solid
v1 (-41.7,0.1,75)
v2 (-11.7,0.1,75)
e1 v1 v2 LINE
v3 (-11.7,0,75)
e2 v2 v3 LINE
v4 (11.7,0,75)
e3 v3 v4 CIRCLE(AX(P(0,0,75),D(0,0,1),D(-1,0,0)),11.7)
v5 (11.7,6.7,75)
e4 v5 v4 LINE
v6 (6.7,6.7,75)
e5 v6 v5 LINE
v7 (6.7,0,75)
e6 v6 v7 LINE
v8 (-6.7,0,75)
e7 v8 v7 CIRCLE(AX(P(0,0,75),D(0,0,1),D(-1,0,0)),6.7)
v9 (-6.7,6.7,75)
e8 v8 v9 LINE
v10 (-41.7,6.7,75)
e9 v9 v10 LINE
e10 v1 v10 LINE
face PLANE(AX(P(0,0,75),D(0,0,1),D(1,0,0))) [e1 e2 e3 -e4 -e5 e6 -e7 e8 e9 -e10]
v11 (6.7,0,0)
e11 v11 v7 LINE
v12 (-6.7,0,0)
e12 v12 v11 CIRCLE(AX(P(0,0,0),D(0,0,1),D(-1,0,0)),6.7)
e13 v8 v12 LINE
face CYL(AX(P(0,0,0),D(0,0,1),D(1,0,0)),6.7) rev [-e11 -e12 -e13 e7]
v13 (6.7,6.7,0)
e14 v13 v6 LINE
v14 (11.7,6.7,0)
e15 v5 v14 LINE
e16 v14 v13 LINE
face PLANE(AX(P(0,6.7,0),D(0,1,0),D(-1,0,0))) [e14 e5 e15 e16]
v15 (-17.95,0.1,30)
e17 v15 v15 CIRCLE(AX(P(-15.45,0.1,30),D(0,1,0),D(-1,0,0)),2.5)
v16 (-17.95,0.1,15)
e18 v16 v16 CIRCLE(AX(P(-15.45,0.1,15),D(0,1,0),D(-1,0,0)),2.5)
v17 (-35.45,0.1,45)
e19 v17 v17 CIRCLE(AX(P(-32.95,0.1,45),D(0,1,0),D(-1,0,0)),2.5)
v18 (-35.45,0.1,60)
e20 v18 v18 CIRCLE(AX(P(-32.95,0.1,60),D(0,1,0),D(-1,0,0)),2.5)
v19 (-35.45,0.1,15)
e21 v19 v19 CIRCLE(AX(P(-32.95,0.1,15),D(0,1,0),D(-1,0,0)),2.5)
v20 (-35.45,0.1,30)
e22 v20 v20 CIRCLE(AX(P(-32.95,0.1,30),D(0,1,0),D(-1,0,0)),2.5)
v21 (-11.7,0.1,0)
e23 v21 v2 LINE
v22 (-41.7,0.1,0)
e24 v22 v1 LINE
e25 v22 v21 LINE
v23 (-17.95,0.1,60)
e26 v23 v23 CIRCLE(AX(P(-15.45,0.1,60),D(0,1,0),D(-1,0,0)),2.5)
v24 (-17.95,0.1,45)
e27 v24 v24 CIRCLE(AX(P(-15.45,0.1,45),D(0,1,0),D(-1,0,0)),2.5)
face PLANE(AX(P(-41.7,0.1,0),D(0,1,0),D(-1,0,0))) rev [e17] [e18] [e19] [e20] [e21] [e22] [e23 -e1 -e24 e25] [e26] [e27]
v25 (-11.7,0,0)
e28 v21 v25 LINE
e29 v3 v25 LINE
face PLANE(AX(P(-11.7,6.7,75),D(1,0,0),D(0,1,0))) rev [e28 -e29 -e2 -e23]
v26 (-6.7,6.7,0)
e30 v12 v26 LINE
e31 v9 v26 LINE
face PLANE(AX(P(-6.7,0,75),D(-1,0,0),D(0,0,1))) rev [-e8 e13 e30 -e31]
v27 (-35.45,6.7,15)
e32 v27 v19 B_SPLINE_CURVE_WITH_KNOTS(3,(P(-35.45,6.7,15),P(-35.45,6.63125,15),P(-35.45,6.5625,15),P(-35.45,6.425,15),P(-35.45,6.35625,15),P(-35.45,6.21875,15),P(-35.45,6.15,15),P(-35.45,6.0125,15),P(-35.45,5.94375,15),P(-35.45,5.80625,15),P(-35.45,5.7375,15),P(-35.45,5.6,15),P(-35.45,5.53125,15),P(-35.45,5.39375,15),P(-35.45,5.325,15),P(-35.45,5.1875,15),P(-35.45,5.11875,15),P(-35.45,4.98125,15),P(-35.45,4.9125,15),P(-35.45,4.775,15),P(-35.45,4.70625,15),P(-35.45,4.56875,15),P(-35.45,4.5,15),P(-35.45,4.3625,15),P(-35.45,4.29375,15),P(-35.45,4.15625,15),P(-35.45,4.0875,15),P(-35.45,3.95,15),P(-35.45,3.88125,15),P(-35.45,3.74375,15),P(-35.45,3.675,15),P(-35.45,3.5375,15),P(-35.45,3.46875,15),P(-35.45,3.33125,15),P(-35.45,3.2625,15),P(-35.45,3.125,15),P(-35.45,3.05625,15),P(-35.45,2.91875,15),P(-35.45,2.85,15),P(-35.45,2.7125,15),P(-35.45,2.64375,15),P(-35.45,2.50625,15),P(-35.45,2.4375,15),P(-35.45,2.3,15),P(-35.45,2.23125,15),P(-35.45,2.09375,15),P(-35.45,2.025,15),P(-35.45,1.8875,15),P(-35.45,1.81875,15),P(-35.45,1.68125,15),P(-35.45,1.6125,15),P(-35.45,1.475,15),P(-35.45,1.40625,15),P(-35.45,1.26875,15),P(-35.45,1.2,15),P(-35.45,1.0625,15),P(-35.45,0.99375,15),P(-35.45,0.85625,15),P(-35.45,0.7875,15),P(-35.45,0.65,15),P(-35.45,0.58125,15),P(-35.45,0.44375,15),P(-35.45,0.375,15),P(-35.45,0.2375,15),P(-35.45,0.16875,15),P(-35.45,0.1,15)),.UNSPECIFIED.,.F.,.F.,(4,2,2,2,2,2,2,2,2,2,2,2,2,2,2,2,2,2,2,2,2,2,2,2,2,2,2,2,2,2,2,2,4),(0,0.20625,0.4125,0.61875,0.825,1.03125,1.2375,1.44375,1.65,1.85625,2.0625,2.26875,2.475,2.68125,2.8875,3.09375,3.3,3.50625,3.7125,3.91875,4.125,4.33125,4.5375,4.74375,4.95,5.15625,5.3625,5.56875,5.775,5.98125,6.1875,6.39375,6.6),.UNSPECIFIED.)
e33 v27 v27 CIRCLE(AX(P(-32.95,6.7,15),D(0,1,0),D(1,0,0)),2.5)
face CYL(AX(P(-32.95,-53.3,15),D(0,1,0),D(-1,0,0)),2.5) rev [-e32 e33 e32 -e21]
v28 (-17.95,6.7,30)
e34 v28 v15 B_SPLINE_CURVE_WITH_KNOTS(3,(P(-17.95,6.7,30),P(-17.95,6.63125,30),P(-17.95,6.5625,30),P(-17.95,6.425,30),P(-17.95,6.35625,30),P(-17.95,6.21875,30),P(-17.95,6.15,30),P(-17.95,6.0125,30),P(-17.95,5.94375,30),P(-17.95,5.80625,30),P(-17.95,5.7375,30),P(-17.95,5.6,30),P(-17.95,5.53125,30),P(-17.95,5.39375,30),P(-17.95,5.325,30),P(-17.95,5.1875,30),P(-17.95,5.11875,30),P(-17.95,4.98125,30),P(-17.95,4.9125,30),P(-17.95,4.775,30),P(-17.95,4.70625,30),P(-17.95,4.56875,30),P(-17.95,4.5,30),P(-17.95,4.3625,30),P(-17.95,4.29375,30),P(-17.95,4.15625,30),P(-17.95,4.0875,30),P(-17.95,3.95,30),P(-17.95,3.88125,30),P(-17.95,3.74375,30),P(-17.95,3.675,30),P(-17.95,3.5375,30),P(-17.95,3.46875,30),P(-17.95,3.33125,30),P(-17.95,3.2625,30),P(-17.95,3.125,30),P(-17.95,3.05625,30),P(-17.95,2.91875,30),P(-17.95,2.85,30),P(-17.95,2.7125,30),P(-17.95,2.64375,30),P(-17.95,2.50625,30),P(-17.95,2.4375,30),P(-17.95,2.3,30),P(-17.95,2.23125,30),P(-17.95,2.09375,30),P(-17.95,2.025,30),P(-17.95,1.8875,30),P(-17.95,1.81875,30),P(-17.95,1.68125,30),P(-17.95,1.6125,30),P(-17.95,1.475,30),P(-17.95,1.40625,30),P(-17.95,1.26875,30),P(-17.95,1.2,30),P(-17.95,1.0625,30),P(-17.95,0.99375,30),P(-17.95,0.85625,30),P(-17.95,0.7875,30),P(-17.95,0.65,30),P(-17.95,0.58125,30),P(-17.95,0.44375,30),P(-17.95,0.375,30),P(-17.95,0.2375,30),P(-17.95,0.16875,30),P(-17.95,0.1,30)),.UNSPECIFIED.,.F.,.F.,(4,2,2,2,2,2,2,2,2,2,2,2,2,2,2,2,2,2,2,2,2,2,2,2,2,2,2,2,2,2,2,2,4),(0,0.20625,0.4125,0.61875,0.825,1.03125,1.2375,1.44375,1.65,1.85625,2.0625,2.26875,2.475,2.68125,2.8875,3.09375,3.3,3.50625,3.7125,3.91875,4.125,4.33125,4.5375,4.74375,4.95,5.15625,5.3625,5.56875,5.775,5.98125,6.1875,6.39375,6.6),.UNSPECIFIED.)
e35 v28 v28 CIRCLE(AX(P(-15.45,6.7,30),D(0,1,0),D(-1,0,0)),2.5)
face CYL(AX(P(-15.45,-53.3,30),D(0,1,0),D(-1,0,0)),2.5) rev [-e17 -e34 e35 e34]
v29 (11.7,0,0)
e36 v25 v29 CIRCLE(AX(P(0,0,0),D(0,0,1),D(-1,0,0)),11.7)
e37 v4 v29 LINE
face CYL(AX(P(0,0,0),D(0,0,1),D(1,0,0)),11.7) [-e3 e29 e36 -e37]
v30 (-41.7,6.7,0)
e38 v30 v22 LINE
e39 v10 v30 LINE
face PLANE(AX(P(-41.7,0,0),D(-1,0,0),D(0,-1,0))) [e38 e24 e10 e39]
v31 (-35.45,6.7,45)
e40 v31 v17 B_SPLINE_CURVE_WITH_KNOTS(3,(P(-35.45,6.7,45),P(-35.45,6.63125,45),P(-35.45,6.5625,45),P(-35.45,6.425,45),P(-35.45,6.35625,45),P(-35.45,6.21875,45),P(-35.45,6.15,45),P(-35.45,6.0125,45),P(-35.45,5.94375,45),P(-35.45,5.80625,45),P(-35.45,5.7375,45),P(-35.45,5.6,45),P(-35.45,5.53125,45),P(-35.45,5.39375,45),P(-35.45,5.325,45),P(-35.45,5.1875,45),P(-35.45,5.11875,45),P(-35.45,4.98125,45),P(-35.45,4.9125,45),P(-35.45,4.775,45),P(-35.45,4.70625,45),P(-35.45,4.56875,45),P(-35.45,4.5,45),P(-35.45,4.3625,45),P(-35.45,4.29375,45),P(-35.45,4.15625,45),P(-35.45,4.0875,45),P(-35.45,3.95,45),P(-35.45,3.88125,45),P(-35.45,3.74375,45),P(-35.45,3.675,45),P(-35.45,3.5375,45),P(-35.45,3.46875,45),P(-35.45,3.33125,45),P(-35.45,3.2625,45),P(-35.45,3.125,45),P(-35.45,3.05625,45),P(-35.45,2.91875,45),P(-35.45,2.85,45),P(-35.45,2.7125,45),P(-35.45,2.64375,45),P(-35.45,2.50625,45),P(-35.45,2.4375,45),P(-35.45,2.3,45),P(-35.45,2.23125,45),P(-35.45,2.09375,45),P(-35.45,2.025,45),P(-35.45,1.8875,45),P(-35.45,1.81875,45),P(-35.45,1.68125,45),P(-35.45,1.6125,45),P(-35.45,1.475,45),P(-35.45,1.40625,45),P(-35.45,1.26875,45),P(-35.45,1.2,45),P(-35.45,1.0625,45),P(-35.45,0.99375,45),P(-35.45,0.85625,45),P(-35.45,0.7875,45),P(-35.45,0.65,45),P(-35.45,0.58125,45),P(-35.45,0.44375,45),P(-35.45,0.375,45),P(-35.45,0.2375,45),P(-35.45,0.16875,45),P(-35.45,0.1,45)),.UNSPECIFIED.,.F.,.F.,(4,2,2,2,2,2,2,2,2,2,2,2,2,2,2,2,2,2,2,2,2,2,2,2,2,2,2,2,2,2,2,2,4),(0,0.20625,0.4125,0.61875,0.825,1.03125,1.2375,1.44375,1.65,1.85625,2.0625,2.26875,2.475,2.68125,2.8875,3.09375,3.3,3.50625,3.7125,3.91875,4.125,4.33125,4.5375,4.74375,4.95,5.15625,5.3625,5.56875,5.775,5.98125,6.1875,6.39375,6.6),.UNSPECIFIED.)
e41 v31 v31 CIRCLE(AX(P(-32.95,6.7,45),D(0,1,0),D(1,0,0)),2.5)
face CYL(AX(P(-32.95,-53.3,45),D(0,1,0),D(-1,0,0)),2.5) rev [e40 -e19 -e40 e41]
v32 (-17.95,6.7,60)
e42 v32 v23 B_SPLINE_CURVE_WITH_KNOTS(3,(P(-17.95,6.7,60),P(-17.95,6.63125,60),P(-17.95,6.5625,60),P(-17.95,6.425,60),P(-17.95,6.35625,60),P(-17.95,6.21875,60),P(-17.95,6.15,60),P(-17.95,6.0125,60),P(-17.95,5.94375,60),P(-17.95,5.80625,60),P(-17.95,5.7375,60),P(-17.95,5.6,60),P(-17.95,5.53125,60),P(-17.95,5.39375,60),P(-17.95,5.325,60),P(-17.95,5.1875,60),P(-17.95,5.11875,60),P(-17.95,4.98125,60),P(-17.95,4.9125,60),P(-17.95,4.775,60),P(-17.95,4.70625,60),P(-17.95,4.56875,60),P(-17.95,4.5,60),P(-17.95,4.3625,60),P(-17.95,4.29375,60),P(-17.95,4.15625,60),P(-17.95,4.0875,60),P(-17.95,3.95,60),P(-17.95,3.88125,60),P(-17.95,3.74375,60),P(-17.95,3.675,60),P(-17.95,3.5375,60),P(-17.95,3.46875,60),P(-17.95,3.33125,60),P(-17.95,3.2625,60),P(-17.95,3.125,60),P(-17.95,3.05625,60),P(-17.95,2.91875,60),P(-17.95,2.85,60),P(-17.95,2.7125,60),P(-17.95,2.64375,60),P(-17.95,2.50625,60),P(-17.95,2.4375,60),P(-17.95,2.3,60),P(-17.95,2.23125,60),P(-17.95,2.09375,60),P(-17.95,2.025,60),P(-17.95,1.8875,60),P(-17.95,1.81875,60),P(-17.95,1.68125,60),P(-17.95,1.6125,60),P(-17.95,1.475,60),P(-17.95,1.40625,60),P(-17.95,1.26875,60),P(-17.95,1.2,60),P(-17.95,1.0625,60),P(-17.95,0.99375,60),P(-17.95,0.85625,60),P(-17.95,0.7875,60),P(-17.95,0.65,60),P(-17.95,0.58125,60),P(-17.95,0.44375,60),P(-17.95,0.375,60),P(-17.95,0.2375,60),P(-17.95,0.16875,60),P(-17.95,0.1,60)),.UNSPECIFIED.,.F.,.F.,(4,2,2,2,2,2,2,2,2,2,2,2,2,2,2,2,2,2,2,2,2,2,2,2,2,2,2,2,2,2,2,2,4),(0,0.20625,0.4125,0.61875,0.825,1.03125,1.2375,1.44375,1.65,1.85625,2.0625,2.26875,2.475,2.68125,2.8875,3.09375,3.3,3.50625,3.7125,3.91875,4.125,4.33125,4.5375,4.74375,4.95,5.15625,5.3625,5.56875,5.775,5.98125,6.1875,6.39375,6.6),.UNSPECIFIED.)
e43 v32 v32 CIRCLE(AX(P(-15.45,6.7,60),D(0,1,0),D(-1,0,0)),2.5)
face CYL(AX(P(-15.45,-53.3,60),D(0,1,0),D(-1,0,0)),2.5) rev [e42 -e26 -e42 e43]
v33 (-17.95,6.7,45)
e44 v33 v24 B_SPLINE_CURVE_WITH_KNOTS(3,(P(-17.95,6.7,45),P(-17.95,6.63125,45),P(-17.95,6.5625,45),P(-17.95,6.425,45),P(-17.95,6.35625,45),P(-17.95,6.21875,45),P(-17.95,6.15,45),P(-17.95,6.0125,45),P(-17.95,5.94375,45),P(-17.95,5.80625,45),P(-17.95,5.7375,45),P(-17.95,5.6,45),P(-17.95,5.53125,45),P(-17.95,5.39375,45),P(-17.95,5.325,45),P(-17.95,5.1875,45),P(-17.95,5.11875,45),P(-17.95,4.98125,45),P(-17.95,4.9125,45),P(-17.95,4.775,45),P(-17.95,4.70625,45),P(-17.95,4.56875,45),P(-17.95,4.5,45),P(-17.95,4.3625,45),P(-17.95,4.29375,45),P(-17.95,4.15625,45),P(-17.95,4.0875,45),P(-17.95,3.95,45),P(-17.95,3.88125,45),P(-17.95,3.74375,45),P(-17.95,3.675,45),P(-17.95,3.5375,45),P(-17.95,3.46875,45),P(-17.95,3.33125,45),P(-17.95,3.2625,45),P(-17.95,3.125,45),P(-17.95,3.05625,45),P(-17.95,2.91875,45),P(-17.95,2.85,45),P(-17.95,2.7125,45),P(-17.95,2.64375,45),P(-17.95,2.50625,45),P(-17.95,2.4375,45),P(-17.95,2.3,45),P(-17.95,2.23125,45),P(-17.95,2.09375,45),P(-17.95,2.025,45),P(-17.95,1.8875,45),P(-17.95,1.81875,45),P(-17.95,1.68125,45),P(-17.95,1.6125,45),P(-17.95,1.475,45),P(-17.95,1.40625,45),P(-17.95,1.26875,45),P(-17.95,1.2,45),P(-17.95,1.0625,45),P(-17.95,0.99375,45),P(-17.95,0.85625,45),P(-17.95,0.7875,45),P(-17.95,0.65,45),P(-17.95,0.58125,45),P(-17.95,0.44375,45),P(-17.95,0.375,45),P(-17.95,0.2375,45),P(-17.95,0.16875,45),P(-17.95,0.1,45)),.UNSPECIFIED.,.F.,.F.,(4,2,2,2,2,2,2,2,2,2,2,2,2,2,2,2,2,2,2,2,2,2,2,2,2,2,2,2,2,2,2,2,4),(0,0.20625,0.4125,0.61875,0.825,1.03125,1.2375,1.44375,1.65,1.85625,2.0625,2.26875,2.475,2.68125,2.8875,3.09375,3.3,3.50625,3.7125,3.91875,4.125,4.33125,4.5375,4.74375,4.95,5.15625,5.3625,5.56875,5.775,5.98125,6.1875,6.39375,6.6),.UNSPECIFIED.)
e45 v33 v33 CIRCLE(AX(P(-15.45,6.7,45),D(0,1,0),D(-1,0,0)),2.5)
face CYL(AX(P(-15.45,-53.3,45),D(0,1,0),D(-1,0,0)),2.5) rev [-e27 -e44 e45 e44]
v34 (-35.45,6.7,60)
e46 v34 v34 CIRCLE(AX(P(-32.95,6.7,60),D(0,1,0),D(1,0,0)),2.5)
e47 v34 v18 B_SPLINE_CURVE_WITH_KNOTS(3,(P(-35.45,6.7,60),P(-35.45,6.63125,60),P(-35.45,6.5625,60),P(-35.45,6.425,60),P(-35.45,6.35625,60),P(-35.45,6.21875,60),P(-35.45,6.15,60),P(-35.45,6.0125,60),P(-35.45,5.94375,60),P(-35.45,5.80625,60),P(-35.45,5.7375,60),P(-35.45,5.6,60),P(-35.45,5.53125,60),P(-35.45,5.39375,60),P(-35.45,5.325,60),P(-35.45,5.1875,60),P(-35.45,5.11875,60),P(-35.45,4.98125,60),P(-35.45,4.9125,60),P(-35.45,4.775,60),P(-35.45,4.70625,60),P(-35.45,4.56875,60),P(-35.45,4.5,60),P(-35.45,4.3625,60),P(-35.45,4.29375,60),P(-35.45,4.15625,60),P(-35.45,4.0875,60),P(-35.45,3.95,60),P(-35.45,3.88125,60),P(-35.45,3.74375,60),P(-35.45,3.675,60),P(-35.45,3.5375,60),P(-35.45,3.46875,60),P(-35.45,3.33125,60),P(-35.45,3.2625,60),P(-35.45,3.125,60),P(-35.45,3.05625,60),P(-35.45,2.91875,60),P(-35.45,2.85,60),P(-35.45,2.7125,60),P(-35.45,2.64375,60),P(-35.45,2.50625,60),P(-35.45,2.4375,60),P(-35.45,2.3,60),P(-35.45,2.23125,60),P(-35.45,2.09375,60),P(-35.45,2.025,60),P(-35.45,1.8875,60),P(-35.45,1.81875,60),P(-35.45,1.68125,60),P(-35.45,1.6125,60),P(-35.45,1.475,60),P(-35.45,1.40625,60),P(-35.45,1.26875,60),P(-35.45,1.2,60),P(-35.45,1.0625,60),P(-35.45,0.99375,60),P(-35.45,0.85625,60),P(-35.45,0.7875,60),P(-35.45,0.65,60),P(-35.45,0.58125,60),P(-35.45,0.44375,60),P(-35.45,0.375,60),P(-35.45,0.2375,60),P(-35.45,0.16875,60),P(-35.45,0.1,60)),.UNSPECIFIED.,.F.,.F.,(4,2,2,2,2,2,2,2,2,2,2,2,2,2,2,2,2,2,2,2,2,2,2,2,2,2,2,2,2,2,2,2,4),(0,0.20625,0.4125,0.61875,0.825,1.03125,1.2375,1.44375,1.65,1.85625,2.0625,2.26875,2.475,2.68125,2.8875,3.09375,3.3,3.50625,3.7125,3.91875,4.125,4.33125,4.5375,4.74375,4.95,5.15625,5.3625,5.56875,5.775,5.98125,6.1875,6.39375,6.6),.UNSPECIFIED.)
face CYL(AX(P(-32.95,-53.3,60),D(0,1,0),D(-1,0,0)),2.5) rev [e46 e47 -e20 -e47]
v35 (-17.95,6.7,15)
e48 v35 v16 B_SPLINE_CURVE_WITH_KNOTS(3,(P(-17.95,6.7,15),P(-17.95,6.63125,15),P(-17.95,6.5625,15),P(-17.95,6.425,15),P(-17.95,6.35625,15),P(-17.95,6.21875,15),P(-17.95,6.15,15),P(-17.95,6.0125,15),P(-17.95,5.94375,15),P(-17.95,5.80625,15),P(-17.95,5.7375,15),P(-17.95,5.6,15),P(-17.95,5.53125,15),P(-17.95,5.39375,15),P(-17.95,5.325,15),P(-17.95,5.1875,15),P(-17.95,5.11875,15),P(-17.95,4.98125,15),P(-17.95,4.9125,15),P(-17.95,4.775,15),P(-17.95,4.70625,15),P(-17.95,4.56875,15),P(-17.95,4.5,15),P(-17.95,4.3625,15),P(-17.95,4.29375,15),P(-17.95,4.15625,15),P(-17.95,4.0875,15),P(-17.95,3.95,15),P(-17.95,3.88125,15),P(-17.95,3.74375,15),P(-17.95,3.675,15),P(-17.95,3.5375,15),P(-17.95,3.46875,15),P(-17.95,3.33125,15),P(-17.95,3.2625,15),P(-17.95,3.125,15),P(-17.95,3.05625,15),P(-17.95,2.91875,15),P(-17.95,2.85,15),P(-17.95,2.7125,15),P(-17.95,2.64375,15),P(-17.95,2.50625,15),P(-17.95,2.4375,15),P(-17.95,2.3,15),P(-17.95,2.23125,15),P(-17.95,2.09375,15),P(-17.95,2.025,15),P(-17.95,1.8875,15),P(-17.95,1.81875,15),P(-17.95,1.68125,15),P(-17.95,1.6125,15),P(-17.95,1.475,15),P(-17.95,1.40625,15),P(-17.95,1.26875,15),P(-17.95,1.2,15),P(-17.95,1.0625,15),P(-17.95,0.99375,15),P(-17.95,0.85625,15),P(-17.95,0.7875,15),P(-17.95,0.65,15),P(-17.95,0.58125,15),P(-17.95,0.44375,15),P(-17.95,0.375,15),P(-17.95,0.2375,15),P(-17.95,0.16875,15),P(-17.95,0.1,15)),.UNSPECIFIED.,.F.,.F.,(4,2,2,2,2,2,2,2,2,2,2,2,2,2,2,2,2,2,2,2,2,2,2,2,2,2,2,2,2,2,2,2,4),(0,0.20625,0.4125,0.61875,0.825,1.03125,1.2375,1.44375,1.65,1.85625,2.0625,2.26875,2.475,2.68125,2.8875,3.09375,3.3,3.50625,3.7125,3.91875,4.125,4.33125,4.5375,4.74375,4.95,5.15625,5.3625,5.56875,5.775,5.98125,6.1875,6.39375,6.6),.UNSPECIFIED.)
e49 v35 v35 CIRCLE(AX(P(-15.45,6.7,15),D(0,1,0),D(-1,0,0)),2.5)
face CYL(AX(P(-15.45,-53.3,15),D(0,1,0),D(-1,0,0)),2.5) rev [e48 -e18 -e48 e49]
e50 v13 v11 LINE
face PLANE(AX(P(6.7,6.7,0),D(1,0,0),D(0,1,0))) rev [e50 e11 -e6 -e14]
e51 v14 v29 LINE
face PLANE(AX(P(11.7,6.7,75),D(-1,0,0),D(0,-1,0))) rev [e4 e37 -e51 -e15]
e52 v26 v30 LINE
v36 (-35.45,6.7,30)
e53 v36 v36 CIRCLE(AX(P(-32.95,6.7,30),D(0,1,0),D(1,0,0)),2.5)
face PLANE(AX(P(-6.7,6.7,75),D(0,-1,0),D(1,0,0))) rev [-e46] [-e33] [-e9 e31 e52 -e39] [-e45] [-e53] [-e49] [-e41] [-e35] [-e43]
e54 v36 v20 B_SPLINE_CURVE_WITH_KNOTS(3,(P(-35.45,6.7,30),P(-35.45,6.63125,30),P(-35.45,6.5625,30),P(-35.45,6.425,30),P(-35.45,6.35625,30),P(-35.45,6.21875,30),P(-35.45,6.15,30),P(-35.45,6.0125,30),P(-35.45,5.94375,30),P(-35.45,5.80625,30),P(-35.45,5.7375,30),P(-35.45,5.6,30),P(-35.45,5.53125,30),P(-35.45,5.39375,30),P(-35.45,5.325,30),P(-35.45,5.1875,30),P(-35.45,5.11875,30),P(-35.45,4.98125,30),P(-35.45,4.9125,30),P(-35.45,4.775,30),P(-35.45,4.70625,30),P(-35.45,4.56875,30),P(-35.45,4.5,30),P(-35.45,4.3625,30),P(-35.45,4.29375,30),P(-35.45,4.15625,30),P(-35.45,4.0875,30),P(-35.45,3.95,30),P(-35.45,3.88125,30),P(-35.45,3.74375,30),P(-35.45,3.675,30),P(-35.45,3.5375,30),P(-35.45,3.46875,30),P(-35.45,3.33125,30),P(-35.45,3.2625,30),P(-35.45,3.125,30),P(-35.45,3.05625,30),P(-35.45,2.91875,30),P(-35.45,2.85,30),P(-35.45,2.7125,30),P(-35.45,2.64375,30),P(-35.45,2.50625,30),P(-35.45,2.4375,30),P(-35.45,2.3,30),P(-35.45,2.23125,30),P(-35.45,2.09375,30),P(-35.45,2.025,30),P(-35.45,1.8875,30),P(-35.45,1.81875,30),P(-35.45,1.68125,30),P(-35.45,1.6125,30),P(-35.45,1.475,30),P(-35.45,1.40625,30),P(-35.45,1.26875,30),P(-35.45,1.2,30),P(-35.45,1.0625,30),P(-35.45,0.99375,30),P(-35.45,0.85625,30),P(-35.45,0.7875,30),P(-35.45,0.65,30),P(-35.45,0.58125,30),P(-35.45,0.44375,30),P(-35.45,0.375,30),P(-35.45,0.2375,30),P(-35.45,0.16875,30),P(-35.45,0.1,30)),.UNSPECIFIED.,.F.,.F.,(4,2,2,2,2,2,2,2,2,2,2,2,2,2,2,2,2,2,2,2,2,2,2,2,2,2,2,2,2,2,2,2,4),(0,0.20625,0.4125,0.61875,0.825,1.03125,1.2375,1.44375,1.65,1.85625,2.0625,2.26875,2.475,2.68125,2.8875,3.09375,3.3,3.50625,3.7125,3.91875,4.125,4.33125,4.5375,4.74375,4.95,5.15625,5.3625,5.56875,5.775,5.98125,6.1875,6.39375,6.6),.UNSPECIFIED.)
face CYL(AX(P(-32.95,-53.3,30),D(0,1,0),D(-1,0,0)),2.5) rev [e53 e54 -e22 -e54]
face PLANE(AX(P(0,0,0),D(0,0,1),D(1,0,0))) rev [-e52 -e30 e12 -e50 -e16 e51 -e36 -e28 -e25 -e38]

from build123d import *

# Parameters (mm, degrees)
SKETCH3_W           = 5
SKETCH3_H           = 6.7
BOSS_EXTRUDE2_DEPTH = 75
SWEEP1_DEPTH        = 75
SKETCH8_W           = 5
SKETCH8_H           = 75
BOSS_EXTRUDE3_DEPTH = 6.7
SKETCH11_W          = 75
SKETCH11_H          = 6.6
BOSS_EXTRUDE4_DEPTH = 30
SKETCH12_R          = 2.5
CUT_EXTRUDE1_DEPTH  = 60


# Read off the part's stored shape, not the designer's step: Sweep1
with BuildPart() as part:
    # Sketch3 → Boss-Extrude2 (new body)
    with BuildSketch(Plane.XY):
        with Locations((-9.2, 3.35)):
            Rectangle(SKETCH3_W, SKETCH3_H)
    extrude(amount=BOSS_EXTRUDE2_DEPTH)

    # Sweep1 outline → Sweep1 (add)
    with BuildSketch(Plane.XY):
        with BuildLine():
            ThreePointArc((-11.7, 0), (0, -11.7), (11.7, 0))
            Line((11.7, 0), (6.7, 0))
            ThreePointArc((6.7, 0), (0, -6.7), (-6.7, 0))
            Line((-6.7, 0), (-11.7, 0))
        make_face()
    extrude(amount=SWEEP1_DEPTH)

    # Sketch8 → Boss-Extrude3 (add)
    with BuildSketch(Plane(origin=(0, 0, 0), x_dir=(1, 0, 0), z_dir=(0, 1, 0))):
        with Locations((9.2, -37.5)):
            Rectangle(SKETCH8_W, SKETCH8_H)
    extrude(amount=BOSS_EXTRUDE3_DEPTH)

    # Sketch11 → Boss-Extrude4 (add)
    with BuildSketch(Plane.ZY.offset(11.7)):
        with Locations((37.5, 3.4)):
            Rectangle(SKETCH11_W, SKETCH11_H)
    extrude(amount=BOSS_EXTRUDE4_DEPTH)

    # Sketch12 → Cut-Extrude1 (cut)
    with BuildSketch(Plane(origin=(0, 6.7, 0), x_dir=(1, 0, 0), z_dir=(0, 1, 0))):
        with Locations(Location((-15.45, -60, 0), (0, 0, 180))):
            Circle(SKETCH12_R)
        with Locations(Location((-15.45, -45, 0), (0, 0, 180))):
            Circle(SKETCH12_R)
        with Locations(Location((-32.95, -45, 0), (0, 0, 180))):
            Circle(SKETCH12_R)
        with Locations(Location((-32.95, -60, 0), (0, 0, 180))):
            Circle(SKETCH12_R)
        with Locations(Location((-15.45, -30, 0), (0, 0, 180))):
            Circle(SKETCH12_R)
        with Locations(Location((-32.95, -30, 0), (0, 0, 180))):
            Circle(SKETCH12_R)
        with Locations(Location((-15.45, -15, 0), (0, 0, 180))):
            Circle(SKETCH12_R)
        with Locations(Location((-32.95, -15, 0), (0, 0, 180))):
            Circle(SKETCH12_R)
    extrude(amount=-CUT_EXTRUDE1_DEPTH, mode=Mode.SUBTRACT)


solid = part.part
